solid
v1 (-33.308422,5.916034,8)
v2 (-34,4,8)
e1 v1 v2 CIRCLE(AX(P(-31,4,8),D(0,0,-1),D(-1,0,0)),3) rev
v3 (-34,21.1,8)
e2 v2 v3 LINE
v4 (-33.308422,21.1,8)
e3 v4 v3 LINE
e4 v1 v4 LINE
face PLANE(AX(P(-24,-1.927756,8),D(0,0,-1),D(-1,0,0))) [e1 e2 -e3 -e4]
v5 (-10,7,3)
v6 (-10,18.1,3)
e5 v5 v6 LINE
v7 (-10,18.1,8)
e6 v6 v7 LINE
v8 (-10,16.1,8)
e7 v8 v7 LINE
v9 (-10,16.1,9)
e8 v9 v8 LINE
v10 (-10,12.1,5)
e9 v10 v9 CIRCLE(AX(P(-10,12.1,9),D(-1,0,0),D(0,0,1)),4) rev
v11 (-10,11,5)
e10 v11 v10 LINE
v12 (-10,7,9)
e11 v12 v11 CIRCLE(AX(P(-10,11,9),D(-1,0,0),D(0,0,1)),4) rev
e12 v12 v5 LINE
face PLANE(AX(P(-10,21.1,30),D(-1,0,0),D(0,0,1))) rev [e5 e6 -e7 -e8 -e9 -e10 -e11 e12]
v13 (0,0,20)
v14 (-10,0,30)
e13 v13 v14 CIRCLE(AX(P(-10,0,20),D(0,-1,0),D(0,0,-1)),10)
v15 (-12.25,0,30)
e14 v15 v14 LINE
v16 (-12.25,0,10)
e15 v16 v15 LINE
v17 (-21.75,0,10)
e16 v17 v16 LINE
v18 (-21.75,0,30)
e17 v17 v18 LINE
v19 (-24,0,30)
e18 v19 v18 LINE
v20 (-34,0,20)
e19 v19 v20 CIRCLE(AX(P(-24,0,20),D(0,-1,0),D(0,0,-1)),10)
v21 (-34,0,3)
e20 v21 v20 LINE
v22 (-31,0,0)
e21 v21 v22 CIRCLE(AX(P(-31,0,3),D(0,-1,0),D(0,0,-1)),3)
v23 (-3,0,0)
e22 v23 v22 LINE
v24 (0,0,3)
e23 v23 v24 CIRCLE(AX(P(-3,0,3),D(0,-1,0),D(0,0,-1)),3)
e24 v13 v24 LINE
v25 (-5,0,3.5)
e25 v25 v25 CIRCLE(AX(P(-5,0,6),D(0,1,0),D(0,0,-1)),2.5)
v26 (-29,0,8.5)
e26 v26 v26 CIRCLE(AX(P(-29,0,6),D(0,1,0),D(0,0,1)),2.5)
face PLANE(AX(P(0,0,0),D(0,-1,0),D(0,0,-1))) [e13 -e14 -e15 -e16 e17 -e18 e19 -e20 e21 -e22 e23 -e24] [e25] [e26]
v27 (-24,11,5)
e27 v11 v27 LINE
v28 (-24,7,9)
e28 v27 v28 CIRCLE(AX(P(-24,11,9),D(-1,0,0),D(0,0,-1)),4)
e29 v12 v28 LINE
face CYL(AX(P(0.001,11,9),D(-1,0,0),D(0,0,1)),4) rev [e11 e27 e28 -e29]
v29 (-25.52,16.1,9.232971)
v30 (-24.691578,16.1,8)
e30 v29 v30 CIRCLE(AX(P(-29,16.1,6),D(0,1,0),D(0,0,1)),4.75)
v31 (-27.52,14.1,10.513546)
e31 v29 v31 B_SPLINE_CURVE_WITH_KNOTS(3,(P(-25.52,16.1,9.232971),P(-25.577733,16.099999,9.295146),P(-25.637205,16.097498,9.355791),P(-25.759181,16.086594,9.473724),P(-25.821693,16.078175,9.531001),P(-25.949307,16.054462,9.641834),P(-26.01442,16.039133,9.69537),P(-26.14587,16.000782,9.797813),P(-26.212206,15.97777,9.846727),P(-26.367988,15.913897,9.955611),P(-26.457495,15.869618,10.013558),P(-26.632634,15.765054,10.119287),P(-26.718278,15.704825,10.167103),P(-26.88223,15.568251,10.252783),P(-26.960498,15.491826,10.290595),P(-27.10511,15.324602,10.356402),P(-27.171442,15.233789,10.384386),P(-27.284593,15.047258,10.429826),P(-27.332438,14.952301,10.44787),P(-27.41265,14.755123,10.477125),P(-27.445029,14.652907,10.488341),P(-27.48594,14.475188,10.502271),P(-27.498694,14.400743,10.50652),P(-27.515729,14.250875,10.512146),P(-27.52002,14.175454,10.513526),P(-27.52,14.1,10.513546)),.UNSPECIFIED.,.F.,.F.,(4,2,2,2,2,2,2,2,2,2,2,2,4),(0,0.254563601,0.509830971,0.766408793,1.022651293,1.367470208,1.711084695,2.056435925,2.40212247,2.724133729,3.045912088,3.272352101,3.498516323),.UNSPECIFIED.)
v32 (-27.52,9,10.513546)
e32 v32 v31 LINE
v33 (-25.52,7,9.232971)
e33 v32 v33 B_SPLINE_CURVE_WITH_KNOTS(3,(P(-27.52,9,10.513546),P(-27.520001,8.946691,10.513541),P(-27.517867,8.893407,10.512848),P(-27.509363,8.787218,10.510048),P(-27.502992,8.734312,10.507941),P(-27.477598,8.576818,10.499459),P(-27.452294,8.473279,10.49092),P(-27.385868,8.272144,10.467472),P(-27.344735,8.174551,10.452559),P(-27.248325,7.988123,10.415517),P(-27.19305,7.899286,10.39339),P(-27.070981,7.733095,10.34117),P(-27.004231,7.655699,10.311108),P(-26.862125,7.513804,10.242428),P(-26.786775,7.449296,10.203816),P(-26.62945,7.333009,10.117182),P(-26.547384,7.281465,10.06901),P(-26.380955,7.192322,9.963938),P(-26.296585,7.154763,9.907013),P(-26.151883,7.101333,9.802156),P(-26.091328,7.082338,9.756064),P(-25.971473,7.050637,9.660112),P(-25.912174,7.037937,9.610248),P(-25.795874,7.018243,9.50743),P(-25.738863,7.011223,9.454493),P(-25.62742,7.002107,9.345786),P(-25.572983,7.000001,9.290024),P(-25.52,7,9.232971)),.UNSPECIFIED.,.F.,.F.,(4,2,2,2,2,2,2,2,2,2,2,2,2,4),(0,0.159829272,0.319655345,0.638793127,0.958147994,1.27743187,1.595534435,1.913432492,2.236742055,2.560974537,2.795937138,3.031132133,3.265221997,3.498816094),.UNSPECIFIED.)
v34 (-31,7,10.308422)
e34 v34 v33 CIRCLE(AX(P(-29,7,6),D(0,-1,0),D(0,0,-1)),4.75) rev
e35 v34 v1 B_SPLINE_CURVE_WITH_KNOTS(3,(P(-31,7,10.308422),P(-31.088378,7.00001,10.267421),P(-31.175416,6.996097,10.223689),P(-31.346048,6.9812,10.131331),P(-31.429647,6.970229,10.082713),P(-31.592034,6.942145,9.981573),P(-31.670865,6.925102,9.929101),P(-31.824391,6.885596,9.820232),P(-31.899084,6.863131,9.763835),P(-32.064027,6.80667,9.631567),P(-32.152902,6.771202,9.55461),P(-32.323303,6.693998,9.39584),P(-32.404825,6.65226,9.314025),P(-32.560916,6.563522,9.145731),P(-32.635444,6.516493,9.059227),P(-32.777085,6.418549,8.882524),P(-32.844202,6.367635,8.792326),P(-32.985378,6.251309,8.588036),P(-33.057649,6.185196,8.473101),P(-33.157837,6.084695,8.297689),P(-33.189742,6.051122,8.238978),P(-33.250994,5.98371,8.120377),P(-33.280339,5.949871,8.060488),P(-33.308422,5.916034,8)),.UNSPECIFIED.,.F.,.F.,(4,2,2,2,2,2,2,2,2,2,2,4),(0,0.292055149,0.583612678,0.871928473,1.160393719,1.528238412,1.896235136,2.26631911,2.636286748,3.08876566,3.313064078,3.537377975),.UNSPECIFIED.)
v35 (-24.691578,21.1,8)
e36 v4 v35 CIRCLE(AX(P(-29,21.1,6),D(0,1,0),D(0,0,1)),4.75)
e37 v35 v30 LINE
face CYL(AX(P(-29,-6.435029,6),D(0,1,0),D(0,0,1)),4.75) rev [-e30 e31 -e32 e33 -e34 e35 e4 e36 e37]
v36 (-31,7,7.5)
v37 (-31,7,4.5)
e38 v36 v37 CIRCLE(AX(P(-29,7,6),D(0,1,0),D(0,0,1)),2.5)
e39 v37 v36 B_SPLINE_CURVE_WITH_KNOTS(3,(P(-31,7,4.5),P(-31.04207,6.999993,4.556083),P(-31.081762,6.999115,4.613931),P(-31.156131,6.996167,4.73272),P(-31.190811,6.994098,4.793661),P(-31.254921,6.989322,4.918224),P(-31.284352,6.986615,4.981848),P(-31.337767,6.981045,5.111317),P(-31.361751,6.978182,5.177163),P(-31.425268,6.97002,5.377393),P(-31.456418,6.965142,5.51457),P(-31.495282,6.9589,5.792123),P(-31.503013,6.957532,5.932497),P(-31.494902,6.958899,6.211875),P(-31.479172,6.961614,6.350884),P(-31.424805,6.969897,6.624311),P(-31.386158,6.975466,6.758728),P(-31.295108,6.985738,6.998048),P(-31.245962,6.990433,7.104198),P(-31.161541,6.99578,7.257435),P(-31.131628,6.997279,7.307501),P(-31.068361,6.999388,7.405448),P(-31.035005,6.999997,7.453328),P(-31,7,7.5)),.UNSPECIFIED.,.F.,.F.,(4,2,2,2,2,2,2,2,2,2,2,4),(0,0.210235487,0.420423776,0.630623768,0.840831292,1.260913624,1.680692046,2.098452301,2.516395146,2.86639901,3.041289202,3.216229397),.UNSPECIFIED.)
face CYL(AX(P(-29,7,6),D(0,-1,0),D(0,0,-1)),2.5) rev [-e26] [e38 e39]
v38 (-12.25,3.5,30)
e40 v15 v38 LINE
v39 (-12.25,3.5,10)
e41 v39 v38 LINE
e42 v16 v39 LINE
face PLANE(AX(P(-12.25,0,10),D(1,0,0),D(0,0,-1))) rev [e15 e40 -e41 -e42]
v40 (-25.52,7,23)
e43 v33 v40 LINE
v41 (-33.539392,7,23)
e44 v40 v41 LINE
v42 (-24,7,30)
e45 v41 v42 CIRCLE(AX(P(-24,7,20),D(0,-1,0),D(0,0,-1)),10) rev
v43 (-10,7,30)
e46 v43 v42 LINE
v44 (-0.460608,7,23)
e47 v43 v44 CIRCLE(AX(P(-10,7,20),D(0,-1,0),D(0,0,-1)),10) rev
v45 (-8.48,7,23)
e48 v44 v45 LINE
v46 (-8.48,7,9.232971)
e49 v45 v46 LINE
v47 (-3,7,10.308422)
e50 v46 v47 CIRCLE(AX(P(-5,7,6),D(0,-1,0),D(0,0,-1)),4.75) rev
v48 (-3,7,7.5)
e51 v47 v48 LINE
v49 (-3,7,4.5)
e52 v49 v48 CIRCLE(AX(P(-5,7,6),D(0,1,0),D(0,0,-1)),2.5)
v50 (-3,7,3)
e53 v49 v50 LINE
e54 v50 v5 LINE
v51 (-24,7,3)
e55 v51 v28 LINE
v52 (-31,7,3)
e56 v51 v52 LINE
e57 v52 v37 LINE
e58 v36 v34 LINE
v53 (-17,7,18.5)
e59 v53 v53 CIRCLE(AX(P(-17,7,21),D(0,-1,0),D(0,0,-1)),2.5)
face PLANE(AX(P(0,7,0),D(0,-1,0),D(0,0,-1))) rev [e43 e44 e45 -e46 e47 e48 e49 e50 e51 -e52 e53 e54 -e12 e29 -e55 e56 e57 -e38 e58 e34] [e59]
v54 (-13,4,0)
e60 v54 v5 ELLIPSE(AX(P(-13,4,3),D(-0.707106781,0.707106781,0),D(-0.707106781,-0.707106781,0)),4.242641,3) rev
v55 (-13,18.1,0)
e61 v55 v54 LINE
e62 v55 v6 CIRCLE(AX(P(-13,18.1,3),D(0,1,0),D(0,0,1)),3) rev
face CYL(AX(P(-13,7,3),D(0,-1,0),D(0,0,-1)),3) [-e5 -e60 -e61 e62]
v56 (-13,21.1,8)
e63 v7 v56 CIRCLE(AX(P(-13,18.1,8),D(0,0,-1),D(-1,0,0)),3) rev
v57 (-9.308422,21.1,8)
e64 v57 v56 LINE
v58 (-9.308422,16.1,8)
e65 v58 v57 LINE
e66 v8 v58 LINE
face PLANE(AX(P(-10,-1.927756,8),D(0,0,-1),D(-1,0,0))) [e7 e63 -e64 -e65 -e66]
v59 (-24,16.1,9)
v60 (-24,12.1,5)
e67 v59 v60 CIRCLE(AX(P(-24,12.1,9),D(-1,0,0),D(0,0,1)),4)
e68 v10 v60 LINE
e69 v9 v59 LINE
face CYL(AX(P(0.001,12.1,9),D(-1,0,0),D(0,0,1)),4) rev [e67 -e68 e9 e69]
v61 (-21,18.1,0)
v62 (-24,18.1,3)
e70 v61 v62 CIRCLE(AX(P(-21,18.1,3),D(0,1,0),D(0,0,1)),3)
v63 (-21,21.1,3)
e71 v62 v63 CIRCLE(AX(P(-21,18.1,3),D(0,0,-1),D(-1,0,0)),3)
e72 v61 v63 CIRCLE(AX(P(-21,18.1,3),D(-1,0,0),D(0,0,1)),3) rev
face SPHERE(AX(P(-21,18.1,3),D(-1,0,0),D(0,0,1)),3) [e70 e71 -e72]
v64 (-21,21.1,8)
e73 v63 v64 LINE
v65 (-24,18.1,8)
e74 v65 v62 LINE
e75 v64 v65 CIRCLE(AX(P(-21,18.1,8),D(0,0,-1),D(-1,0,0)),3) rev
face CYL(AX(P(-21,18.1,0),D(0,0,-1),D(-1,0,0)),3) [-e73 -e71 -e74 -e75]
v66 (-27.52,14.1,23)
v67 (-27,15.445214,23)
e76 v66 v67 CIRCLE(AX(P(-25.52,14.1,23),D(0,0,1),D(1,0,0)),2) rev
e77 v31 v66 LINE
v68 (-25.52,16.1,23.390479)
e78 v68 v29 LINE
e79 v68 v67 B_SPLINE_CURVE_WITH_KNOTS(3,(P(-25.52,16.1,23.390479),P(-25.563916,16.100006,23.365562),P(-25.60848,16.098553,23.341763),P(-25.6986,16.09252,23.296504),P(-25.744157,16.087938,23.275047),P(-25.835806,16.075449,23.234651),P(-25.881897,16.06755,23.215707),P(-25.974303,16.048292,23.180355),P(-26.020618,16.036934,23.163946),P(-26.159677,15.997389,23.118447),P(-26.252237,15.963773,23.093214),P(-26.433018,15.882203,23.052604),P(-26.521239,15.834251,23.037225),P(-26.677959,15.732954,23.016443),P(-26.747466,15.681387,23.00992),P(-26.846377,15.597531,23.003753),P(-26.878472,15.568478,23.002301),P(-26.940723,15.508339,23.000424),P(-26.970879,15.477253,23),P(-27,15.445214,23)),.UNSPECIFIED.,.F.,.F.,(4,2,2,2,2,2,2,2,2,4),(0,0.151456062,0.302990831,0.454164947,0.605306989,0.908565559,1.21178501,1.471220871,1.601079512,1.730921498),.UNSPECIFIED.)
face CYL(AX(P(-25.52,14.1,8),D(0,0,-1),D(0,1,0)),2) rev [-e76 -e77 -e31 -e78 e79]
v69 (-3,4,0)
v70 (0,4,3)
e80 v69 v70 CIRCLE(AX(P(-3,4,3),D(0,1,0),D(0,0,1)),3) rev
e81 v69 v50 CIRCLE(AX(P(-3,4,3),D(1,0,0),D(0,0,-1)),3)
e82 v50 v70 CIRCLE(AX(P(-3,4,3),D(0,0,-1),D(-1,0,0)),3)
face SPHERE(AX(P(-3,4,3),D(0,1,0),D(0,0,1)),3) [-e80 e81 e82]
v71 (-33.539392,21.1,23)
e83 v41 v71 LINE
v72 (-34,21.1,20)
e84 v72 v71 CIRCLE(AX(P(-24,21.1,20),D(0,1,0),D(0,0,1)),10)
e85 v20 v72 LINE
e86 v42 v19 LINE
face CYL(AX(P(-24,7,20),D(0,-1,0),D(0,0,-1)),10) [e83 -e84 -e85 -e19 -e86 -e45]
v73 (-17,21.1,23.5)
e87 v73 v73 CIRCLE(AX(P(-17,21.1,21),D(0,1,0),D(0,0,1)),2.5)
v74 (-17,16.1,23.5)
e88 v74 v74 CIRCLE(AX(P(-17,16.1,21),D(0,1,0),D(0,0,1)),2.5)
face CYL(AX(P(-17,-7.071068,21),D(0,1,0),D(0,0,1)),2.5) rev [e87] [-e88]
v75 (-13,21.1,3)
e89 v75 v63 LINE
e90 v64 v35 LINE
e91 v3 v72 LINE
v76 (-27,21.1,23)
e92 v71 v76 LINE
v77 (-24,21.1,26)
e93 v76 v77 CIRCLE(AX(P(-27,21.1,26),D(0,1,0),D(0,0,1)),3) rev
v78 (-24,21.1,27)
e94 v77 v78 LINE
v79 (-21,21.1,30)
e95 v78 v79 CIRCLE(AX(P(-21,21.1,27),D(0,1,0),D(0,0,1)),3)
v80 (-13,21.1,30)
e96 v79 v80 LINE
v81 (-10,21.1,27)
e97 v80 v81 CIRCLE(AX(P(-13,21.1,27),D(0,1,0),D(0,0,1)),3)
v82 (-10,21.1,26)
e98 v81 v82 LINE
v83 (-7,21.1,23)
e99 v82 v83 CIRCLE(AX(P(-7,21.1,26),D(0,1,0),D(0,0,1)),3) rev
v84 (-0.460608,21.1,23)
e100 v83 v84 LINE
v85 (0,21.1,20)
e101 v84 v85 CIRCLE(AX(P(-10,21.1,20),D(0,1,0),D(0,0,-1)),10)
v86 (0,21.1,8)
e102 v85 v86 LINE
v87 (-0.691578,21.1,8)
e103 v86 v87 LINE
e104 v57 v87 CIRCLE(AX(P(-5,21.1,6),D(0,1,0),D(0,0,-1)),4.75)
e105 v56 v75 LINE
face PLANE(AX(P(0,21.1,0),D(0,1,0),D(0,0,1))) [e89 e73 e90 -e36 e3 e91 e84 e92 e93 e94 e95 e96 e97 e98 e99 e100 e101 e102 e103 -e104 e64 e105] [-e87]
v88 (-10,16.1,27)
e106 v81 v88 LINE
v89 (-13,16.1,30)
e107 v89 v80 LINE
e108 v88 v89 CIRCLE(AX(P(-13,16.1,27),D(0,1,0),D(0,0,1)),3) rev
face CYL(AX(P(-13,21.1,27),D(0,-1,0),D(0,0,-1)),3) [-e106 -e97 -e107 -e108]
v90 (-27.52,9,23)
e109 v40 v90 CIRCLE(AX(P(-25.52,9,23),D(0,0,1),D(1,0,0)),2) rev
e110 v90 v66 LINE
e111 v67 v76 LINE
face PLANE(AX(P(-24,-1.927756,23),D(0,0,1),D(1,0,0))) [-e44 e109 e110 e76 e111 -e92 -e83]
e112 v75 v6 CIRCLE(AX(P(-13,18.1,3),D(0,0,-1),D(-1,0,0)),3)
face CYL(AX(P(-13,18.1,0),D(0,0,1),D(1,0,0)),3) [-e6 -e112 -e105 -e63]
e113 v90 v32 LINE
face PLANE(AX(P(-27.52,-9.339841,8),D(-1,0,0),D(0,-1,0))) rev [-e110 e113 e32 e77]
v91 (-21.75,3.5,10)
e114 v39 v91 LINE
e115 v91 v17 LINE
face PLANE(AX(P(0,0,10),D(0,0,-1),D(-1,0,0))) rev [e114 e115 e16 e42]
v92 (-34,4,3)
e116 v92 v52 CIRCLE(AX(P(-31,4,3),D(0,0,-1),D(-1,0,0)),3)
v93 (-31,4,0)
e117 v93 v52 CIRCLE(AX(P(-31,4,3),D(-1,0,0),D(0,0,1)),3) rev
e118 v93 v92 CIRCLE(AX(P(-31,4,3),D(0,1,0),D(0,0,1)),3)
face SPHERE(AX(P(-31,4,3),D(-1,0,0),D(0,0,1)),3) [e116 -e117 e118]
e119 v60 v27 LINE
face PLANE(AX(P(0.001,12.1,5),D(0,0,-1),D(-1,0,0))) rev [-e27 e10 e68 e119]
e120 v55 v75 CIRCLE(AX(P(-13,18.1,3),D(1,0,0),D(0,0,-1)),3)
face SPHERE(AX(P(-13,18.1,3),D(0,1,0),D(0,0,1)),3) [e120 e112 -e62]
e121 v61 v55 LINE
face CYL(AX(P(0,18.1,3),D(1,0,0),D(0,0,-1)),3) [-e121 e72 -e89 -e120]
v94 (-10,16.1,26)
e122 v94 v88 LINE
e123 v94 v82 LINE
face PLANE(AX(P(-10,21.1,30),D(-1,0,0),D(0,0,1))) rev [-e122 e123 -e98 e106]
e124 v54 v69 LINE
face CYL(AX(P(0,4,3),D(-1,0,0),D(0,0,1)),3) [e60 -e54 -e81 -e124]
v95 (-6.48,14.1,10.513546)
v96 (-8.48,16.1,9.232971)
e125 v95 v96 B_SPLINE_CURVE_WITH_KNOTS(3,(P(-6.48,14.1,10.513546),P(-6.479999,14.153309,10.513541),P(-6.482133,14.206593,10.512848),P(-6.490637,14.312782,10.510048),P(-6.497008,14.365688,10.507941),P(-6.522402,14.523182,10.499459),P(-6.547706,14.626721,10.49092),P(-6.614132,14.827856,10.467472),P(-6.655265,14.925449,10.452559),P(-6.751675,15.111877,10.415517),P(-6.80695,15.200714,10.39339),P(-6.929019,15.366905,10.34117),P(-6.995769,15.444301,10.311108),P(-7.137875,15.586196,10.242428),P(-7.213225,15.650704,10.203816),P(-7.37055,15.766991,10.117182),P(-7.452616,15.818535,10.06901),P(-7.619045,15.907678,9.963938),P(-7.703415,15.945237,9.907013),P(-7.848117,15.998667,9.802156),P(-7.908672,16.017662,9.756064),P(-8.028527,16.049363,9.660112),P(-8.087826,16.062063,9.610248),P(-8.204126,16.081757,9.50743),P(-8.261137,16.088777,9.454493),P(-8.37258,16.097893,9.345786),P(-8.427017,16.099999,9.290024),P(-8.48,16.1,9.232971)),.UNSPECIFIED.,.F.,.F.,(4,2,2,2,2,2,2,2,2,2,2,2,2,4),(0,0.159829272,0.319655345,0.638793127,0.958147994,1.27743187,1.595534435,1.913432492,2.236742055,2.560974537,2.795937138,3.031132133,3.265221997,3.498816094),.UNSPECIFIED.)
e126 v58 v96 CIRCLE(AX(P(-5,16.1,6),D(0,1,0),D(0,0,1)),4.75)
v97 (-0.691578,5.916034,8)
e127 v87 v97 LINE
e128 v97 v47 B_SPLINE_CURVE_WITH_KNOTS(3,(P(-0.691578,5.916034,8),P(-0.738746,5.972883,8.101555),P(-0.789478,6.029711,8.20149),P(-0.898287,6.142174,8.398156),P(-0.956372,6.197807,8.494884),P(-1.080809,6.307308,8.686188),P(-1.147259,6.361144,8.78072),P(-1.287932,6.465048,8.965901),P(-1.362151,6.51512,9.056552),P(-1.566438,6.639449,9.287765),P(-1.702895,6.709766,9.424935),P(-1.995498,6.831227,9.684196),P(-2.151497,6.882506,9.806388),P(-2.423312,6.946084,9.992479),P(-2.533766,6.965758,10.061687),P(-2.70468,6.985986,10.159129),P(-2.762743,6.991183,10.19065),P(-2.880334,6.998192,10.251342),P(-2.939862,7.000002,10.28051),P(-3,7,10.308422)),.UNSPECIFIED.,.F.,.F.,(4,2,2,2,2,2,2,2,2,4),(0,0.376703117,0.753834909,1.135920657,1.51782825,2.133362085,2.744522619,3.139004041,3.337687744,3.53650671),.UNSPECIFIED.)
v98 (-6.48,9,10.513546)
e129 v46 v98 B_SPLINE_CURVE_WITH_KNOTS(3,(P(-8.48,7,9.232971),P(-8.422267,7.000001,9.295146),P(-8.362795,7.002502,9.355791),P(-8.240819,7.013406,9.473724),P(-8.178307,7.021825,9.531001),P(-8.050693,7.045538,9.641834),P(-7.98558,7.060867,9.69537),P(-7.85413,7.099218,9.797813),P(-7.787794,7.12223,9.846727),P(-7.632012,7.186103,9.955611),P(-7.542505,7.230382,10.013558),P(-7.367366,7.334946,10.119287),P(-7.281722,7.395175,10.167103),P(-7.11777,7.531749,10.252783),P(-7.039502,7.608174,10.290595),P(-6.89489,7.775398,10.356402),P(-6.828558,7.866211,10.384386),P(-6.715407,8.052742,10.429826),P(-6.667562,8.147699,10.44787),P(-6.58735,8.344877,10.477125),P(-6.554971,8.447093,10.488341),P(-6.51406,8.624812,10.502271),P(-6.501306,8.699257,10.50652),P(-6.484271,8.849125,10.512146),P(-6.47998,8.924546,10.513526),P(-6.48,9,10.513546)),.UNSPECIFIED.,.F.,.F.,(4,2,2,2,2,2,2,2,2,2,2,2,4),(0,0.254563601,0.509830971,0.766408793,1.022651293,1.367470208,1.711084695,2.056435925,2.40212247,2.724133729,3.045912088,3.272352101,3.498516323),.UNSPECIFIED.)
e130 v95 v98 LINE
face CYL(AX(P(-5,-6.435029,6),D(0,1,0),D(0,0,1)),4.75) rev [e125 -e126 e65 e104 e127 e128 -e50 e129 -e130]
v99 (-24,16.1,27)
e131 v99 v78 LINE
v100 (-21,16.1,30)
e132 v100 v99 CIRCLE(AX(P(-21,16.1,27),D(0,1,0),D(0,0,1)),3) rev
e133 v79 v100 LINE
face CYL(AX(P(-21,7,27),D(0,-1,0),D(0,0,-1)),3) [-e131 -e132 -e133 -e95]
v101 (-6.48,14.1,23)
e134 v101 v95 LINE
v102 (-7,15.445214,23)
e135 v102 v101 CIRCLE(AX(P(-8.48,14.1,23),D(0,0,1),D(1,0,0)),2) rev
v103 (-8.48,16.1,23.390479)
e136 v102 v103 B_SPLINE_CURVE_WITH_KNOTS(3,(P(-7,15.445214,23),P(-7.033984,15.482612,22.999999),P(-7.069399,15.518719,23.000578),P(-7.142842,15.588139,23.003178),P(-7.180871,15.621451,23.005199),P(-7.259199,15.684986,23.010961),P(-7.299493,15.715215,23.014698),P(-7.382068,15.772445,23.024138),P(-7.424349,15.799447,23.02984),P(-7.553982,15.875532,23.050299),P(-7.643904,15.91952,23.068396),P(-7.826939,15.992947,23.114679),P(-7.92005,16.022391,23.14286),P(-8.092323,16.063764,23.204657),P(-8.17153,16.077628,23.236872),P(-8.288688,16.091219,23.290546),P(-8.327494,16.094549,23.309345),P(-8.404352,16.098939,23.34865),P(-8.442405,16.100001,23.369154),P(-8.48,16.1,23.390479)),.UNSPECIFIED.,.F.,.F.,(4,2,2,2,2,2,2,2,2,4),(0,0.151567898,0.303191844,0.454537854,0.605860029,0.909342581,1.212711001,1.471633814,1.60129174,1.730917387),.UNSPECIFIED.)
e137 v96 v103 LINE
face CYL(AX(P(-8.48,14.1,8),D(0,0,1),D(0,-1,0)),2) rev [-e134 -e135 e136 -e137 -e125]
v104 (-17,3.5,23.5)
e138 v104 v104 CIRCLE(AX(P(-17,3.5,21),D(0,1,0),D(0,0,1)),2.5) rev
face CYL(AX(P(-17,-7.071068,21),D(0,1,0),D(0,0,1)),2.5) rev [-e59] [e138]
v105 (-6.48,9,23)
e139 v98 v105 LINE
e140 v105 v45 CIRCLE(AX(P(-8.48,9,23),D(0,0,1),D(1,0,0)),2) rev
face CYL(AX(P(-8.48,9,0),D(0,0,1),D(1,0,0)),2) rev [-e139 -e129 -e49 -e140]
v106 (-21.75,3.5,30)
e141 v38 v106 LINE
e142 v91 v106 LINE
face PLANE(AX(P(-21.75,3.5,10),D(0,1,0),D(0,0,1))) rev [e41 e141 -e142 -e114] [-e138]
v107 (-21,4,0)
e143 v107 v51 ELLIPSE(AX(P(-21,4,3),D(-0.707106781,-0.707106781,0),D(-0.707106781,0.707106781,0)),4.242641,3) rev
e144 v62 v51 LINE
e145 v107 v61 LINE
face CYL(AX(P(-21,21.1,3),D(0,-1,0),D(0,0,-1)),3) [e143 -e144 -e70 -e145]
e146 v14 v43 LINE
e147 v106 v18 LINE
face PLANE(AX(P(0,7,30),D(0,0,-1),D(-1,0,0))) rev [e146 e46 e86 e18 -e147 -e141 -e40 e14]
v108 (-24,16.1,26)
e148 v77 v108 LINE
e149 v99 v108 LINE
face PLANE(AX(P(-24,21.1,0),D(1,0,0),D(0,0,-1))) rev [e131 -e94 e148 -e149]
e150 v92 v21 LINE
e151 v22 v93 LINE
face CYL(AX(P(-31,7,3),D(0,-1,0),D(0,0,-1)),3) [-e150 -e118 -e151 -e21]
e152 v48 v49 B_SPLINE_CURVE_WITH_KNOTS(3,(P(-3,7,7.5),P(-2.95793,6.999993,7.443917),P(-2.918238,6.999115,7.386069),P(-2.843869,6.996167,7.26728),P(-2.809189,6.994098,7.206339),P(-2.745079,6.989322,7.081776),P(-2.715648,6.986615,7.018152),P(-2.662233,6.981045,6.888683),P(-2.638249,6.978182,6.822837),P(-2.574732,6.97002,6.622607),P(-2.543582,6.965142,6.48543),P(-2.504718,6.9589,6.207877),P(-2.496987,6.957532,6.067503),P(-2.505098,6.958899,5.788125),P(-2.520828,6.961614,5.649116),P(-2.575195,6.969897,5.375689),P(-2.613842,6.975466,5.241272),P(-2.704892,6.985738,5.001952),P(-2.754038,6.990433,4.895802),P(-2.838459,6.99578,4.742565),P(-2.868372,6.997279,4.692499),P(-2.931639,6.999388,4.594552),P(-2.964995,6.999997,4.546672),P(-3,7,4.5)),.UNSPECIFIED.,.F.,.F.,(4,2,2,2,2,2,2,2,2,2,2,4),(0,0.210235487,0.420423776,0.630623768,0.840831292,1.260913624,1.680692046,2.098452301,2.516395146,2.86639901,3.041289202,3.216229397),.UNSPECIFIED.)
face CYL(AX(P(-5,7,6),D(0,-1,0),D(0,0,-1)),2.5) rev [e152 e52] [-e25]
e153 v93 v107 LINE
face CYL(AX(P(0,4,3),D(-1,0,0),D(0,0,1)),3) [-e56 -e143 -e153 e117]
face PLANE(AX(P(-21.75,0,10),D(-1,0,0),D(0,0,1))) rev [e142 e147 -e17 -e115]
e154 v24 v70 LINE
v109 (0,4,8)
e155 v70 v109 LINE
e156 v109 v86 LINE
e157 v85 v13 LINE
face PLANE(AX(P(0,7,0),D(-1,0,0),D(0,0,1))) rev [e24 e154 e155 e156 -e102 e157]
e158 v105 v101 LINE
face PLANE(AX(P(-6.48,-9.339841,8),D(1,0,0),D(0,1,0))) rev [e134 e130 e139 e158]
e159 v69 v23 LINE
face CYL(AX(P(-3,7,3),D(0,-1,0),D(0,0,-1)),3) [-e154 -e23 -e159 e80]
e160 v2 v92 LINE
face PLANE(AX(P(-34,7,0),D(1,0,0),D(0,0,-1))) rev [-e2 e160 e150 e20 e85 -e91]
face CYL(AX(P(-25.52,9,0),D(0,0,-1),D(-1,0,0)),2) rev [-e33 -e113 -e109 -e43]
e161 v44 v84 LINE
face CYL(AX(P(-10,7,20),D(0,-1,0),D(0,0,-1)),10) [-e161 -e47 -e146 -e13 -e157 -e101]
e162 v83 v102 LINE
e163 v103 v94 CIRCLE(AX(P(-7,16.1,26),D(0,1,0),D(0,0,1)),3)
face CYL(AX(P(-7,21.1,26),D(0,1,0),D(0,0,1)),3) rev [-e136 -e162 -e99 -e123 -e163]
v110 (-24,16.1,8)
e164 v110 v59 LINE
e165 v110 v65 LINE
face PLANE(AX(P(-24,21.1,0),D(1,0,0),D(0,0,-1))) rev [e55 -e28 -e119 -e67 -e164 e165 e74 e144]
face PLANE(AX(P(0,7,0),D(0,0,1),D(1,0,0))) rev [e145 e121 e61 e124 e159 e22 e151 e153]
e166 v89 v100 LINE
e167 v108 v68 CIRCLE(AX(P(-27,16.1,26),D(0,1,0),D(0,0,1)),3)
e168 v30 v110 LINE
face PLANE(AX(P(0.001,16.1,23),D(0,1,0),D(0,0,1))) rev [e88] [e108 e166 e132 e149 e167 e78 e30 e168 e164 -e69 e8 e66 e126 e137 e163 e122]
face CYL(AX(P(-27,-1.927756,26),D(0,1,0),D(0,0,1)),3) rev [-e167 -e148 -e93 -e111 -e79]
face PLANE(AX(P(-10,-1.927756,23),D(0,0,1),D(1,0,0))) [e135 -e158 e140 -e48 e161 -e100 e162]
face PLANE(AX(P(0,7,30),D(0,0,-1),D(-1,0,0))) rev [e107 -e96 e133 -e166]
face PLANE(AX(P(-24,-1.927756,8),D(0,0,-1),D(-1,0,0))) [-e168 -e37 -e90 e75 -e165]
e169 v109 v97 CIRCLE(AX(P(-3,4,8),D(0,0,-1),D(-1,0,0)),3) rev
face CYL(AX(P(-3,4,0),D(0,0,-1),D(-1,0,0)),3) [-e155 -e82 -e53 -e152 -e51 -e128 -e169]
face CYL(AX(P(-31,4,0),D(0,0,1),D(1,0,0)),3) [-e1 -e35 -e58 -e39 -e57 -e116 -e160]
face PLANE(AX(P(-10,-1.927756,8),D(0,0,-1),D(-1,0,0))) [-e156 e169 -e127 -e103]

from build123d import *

# Parameters (mm, degrees)
CROQUIS1_W              = 34
CROQUIS1_H              = 30
CROQUIS1_R              = 2.5
SALIENTE_EXTRUIR1_DEPTH = 7
REDONDEO1_R             = 10
CROQUIS2_W              = 14
CROQUIS2_H              = 30
SALIENTE_EXTRUIR2_DEPTH = 14.1
CORTAR_EXTRUIR1_REACH   = 45.832
CORTAR_EXTRUIR2_REACH   = 52.012
CROQUIS4_R              = 2.5
CROQUIS5_W              = 9.5
CROQUIS5_H              = 3.5
CORTAR_EXTRUIR3_DEPTH   = 20
SALIENTE_EXTRUIR3_DEPTH = 5
SALIENTE_EXTRUIR4_DEPTH = 9.1
CORTAR_EXTRUIR4_REACH   = 52.012
CROQUIS8_R              = 4.75
REDONDEO5_R             = 2
REDONDEO6_R             = 3
REDONDEO7_R             = 3


with BuildPart() as part:
    # Croquis1 → Saliente-Extruir1 (new body)
    with BuildSketch(Plane(origin=(0, 0, 0), x_dir=(1, 0, 0), z_dir=(0, 1, 0))):
        with Locations((-17, -15)):
            Rectangle(CROQUIS1_W, CROQUIS1_H)
        with Locations(Location((-29, -6, 0), (0, 0, 90))):
            Circle(CROQUIS1_R, mode=Mode.SUBTRACT)
        with Locations(Location((-5, -6, 0), (0, 0, 90))):
            Circle(CROQUIS1_R, mode=Mode.SUBTRACT)
    extrude(amount=SALIENTE_EXTRUIR1_DEPTH)

    # Redondeo1
    redondeo1_edges = [part.edges().sort_by_distance(p)[0] for p in [
        (0, 3.5, 30),
        (-34, 3.5, 30),
    ]]
    fillet(redondeo1_edges, radius=REDONDEO1_R)

    # Croquis2 → Saliente-Extruir2 (add)
    with BuildSketch(Plane(origin=(0, 7, 0), x_dir=(1, 0, 0), z_dir=(0, 1, 0))):
        with Locations((-17, -15)):
            Rectangle(CROQUIS2_W, CROQUIS2_H)
    extrude(amount=SALIENTE_EXTRUIR2_DEPTH)

    # Croquis3 → Cortar-Extruir1 (cut, up to next)
    with BuildSketch(Plane.ZY.offset(24), mode=Mode.PRIVATE) as cortar_extruir1_sk1:
        with BuildLine():
            Line((9, 7), (30, 7))
            Line((30, 7), (30, 16.1))
            Line((30, 16.1), (23, 16.1))
            Line((23, 16.1), (9, 16.1))
            ThreePointArc((9, 16.1), (6.171572875, 14.928427125), (5, 12.1))
            Line((5, 12.1), (5, 11))
            ThreePointArc((5, 11), (6.171572875, 8.171572875), (9, 7))
        make_face()
    cortar_extruir1_tool1 = extrude(cortar_extruir1_sk1.sketch, amount=-CORTAR_EXTRUIR1_REACH, mode=Mode.PRIVATE) & part.part
    add(cortar_extruir1_tool1.solids().sort_by_distance((-24, 11.55, 17.861257))[0], mode=Mode.SUBTRACT)

    # Cortar-Extruir2: up to this face of the body (flat: up to its plane)
    cortar_extruir2_end = Plane(part.part.faces().sort_by_distance((-17, 0, 14.792595458))[0])
    # Croquis4 → Cortar-Extruir2 (cut, up to the picked face)
    with BuildSketch(Plane(origin=(0, 21.1, 0), x_dir=(1, 0, 0), z_dir=(0, 1, 0)), mode=Mode.PRIVATE) as cortar_extruir2_sk1:
        with Locations(Location((-17, -21, 0), (0, 0, 270))):
            Circle(CROQUIS4_R)
    cortar_extruir2_tool1 = split(extrude(cortar_extruir2_sk1.sketch, amount=-CORTAR_EXTRUIR2_REACH, mode=Mode.PRIVATE), bisect_by=cortar_extruir2_end, keep=Keep.BOTH, mode=Mode.PRIVATE)
    add(cortar_extruir2_tool1.solids().sort_by(Axis((-17, 21.1, 21), (0, -1, 0)))[0], mode=Mode.SUBTRACT)

    # Croquis5 → Cortar-Extruir3 (cut)
    with BuildSketch(Plane.XY.offset(30)):
        with Locations((-17, 1.75)):
            Rectangle(CROQUIS5_W, CROQUIS5_H)
    extrude(amount=-CORTAR_EXTRUIR3_DEPTH, mode=Mode.SUBTRACT)

    # Croquis6 → Saliente-Extruir3 (add)
    with BuildSketch(Plane(origin=(0, 21.1, 0), x_dir=(1, 0, 0), z_dir=(0, 1, 0))):
        with BuildLine():
            Line((-24, -23), (-33.539392014, -23))
            ThreePointArc((-33.539392014, -23), (-33.884177258, -21.517576993), (-34, -20))
            Line((-34, -20), (-34, -8))
            Line((-34, -8), (-24, -8))
            Line((-24, -8), (-24, -23))
        make_face()
        with BuildLine():
            Line((-10, -23), (-0.460607986, -23))
            ThreePointArc((-0.460607986, -23), (-0.115822742, -21.517576993), (0, -20))
            Line((0, -20), (0, -8))
            Line((0, -8), (-10, -8))
            Line((-10, -8), (-10, -23))
        make_face()
    extrude(amount=-SALIENTE_EXTRUIR3_DEPTH)

    # Croquis7 → Saliente-Extruir4 (add)
    with BuildSketch(Plane.XZ.offset(-16.1)):
        with BuildLine():
            Line((-27.52, 8), (-34, 8))
            Line((-34, 8), (-34, 20))
            ThreePointArc((-34, 20), (-33.884177258, 21.517576993), (-33.539392014, 23))
            Line((-33.539392014, 23), (-27.52, 23))
            Line((-27.52, 23), (-27.52, 8))
        make_face()
        with BuildLine():
            Line((0, 8), (0, 20))
            ThreePointArc((0, 20), (-0.115822742, 21.517576993), (-0.460607986, 23))
            Line((-0.460607986, 23), (-6.48, 23))
            Line((-6.48, 23), (-6.48, 8))
            Line((-6.48, 8), (0, 8))
        make_face()
    extrude(amount=SALIENTE_EXTRUIR4_DEPTH)

    # Cortar-Extruir4: up to this face of the body (flat: up to its plane)
    cortar_extruir4_end = Plane(part.part.faces().sort_by_distance((-17, 7, 16.508515524))[0])
    # Croquis8 → Cortar-Extruir4 (cut, up to the picked face)
    with BuildSketch(Plane(origin=(0, 21.1, 0), x_dir=(1, 0, 0), z_dir=(0, 1, 0)), mode=Mode.PRIVATE) as cortar_extruir4_sk1:
        with Locations((-29, -6)):
            Circle(CROQUIS8_R)
    cortar_extruir4_tool1 = split(extrude(cortar_extruir4_sk1.sketch, amount=-CORTAR_EXTRUIR4_REACH, mode=Mode.PRIVATE), bisect_by=cortar_extruir4_end, keep=Keep.BOTH, mode=Mode.PRIVATE)
    # Croquis8 → Cortar-Extruir4 (cut, up to the picked face)
    with BuildSketch(Plane(origin=(0, 21.1, 0), x_dir=(1, 0, 0), z_dir=(0, 1, 0)), mode=Mode.PRIVATE) as cortar_extruir4_sk2:
        with Locations((-5, -6)):
            Circle(CROQUIS8_R)
    cortar_extruir4_tool2 = split(extrude(cortar_extruir4_sk2.sketch, amount=-CORTAR_EXTRUIR4_REACH, mode=Mode.PRIVATE), bisect_by=cortar_extruir4_end, keep=Keep.BOTH, mode=Mode.PRIVATE)
    add(cortar_extruir4_tool1.solids().sort_by(Axis((-29, 21.1, 6), (0, -1, 0)))[0], mode=Mode.SUBTRACT)
    add(cortar_extruir4_tool2.solids().sort_by(Axis((-5, 21.1, 6), (0, -1, 0)))[0], mode=Mode.SUBTRACT)

    # Redondeo5
    redondeo5_edges = [part.edges().sort_by_distance(p)[0] for p in [
        (-6.48, 7, 16.756773139),
        (-6.48, 16.1, 16.756773139),
        (-27.52, 16.1, 16.756773139),
        (-27.52, 7, 16.756773139),
    ]]
    fillet(redondeo5_edges, radius=REDONDEO5_R)

    # Redondeo6
    redondeo6_edges = [part.edges().sort_by_distance(p)[0] for p in [
        (-24, 18.6, 23),
        (-10, 18.6, 23),
        (-10, 18.6, 30),
        (-24, 18.6, 30),
    ]]
    fillet(redondeo6_edges, radius=REDONDEO6_R)

    # Redondeo7
    # the kernel refuses this fillet: 3 mm, written as the material it takes off along each edge
    with BuildSketch(Plane(origin=(-3, 4, 3), x_dir=(0, 1, 0), z_dir=(0, 0, -1))) as redondeo7_piece_1_section:
        Polygon((0, 0), (REDONDEO7_R, 0), (REDONDEO7_R, REDONDEO7_R), (0, REDONDEO7_R), align=None)
    redondeo7_piece_1 = extrude(amount=REDONDEO7_R, mode=Mode.PRIVATE)
    redondeo7_piece_1 = redondeo7_piece_1 - Plane(origin=(-3, 4, 3), x_dir=(-0.7071067811865475, -0.7071067811865475, 0), z_dir=(0, 0, -1)) * Sphere(REDONDEO7_R, mode=Mode.PRIVATE)
    add(redondeo7_piece_1, mode=Mode.SUBTRACT)
    with BuildSketch(Plane(origin=(-31, 4, 3), x_dir=(0, 1, 0), z_dir=(-1, 0, 0))) as redondeo7_piece_2_section:
        Polygon((0, 0), (REDONDEO7_R, 0), (REDONDEO7_R, REDONDEO7_R), (0, REDONDEO7_R), align=None)
    redondeo7_piece_2 = extrude(amount=REDONDEO7_R, mode=Mode.PRIVATE)
    redondeo7_piece_2 = redondeo7_piece_2 - Plane(origin=(-31, 4, 3), x_dir=(0, -0.7071067811865475, 0.7071067811865475), z_dir=(-1, 0, 0)) * Sphere(REDONDEO7_R, mode=Mode.PRIVATE)
    add(redondeo7_piece_2, mode=Mode.SUBTRACT)
    with BuildSketch(Plane(origin=(-21, 18.1, 3), x_dir=(0, 1, 0), z_dir=(-1, 0, 0))) as redondeo7_piece_3_section:
        Polygon((0, 0), (REDONDEO7_R, 0), (REDONDEO7_R, REDONDEO7_R), (0, REDONDEO7_R), align=None)
    redondeo7_piece_3 = extrude(amount=REDONDEO7_R, mode=Mode.PRIVATE)
    redondeo7_piece_3 = redondeo7_piece_3 - Plane(origin=(-21, 18.1, 3), x_dir=(0, -0.7071067811865475, 0.7071067811865475), z_dir=(-1, 0, 0)) * Sphere(REDONDEO7_R, mode=Mode.PRIVATE)
    add(redondeo7_piece_3, mode=Mode.SUBTRACT)
    with BuildSketch(Plane(origin=(-13, 18.1, 3), x_dir=(1, 0, 0), z_dir=(0, 1, 0))) as redondeo7_piece_4_section:
        Polygon((0, 0), (REDONDEO7_R, 0), (REDONDEO7_R, REDONDEO7_R), (0, REDONDEO7_R), align=None)
    redondeo7_piece_4 = extrude(amount=REDONDEO7_R, mode=Mode.PRIVATE)
    redondeo7_piece_4 = redondeo7_piece_4 - Plane(origin=(-13, 18.1, 3), x_dir=(-0.7071067811865468, 0, 0.707106781186548), z_dir=(0, 1, 0)) * Sphere(REDONDEO7_R, mode=Mode.PRIVATE)
    add(redondeo7_piece_4, mode=Mode.SUBTRACT)
    with BuildSketch(Plane(origin=(0, -7.5, 0), x_dir=(0, 0, 1), z_dir=(0, 1, 0)), Plane(origin=(-34, -7.5, 0), x_dir=(1, 0, 0), z_dir=(0, 1, 0))) as redondeo7_piece_5:
        with BuildLine():
            CenterArc((REDONDEO7_R, -REDONDEO7_R), REDONDEO7_R, 90, 90)
            Line((0, -REDONDEO7_R), (0, 0))
            Line((0, 0), (REDONDEO7_R, 0))
        make_face()
    extrude(amount=11.5, mode=Mode.SUBTRACT)
    with BuildSketch(Plane(origin=(-34, 7, 3), x_dir=(1, 0, 0), z_dir=(0, 0, 1))) as redondeo7_piece_6_section:
        with BuildLine():
            CenterArc((REDONDEO7_R, -REDONDEO7_R), REDONDEO7_R, 90, 90)
            Line((0, -REDONDEO7_R), (0, 0))
            Line((0, 0), (REDONDEO7_R, 0))
        make_face()
    redondeo7_piece_6 = extrude(amount=5, mode=Mode.PRIVATE)
    redondeo7_piece_6 = redondeo7_piece_6 & Plane(origin=(-29, 6.638457851, 6), x_dir=(1, 0, 0), z_dir=(0, 1, 0)) * Cylinder(4.75, 23, mode=Mode.PRIVATE)
    add(redondeo7_piece_6, mode=Mode.SUBTRACT)
    with BuildSketch(Plane(origin=(-34, 7, 3), x_dir=(1, 0, 0), z_dir=(0, 0, 1))) as redondeo7_piece_7_section:
        with BuildLine():
            CenterArc((REDONDEO7_R, -REDONDEO7_R), REDONDEO7_R, 90, 90)
            Line((0, -REDONDEO7_R), (0, 0))
            Line((0, 0), (REDONDEO7_R, 0))
        make_face()
    redondeo7_piece_7 = extrude(amount=5, mode=Mode.PRIVATE)
    redondeo7_piece_7 = redondeo7_piece_7 - Plane(origin=(-29, 5.984939517, 6), x_dir=(1, 0, 0), z_dir=(0, 1, 0)) * Cylinder(4.75, 23, mode=Mode.PRIVATE)
    add(redondeo7_piece_7, mode=Mode.SUBTRACT)
    with BuildSketch(Plane(origin=(-34, 7, 3), x_dir=(1, 0, 0), z_dir=(0, 0, 1))) as redondeo7_piece_8_section:
        with BuildLine():
            CenterArc((REDONDEO7_R, -REDONDEO7_R), REDONDEO7_R, 90, 90)
            Line((0, -REDONDEO7_R), (0, 0))
            Line((0, 0), (REDONDEO7_R, 0))
        make_face()
    redondeo7_piece_8 = extrude(amount=12.5, mode=Mode.PRIVATE)
    redondeo7_piece_8 = split(redondeo7_piece_8, bisect_by=Plane(origin=(-32.327413767, 6.840048654, 8), z_dir=(0, 0, 1)), keep=Keep.TOP, mode=Mode.PRIVATE)
    redondeo7_piece_8 = redondeo7_piece_8 & Plane(origin=(-29, 6.840048654, 6), x_dir=(1, 0, 0), z_dir=(0, 1, 0)) * Cylinder(4.75, 38, mode=Mode.PRIVATE)
    add(redondeo7_piece_8, mode=Mode.SUBTRACT)
    with BuildSketch(Plane(origin=(0, 7, 8), x_dir=(-1, 0, 0), z_dir=(0, 0, -1))) as redondeo7_piece_9_section:
        with BuildLine():
            CenterArc((REDONDEO7_R, -REDONDEO7_R), REDONDEO7_R, 90, 90)
            Line((0, -REDONDEO7_R), (0, 0))
            Line((0, 0), (REDONDEO7_R, 0))
        make_face()
    redondeo7_piece_9 = extrude(amount=5, mode=Mode.PRIVATE)
    redondeo7_piece_9 = redondeo7_piece_9 - Plane(origin=(-5, 5.984939497, 6), x_dir=(1, 0, 0), z_dir=(0, 1, 0)) * Cylinder(4.75, 23, mode=Mode.PRIVATE)
    add(redondeo7_piece_9, mode=Mode.SUBTRACT)
    with BuildSketch(Plane(origin=(0, 7, 15.5), x_dir=(-1, 0, 0), z_dir=(0, 0, -1))) as redondeo7_piece_10_section:
        with BuildLine():
            CenterArc((REDONDEO7_R, -REDONDEO7_R), REDONDEO7_R, 90, 90)
            Line((0, -REDONDEO7_R), (0, 0))
            Line((0, 0), (REDONDEO7_R, 0))
        make_face()
    redondeo7_piece_10 = extrude(amount=12.5, mode=Mode.PRIVATE)
    redondeo7_piece_10 = redondeo7_piece_10 & Plane(origin=(-5, 6.840048634, 6), x_dir=(1, 0, 0), z_dir=(0, 1, 0)) * Cylinder(4.75, 38, mode=Mode.PRIVATE)
    redondeo7_piece_10 = split(redondeo7_piece_10, bisect_by=Plane(origin=(-1.672586324, 6.840048634, 8), z_dir=(0, 0, 1)), keep=Keep.TOP, mode=Mode.PRIVATE)
    add(redondeo7_piece_10, mode=Mode.SUBTRACT)
    with BuildSketch(Plane(origin=(0, 7, 8), x_dir=(-1, 0, 0), z_dir=(0, 0, -1))) as redondeo7_piece_11_section:
        with BuildLine():
            CenterArc((REDONDEO7_R, -REDONDEO7_R), REDONDEO7_R, 90, 90)
            Line((0, -REDONDEO7_R), (0, 0))
            Line((0, 0), (REDONDEO7_R, 0))
        make_face()
    redondeo7_piece_11 = extrude(amount=5, mode=Mode.PRIVATE)
    redondeo7_piece_11 = redondeo7_piece_11 & Plane(origin=(-5, 6.638457797, 6), x_dir=(1, 0, 0), z_dir=(0, 1, 0)) * Cylinder(4.75, 23, mode=Mode.PRIVATE)
    add(redondeo7_piece_11, mode=Mode.SUBTRACT)
    with BuildSketch(Plane(origin=(-3, 7, 0), x_dir=(0, 0, 1), z_dir=(-1, 0, 0)), Plane(origin=(-24, 7, 0), x_dir=(0, 0, 1), z_dir=(-1, 0, 0))) as redondeo7_piece_12:
        with BuildLine():
            CenterArc((REDONDEO7_R, -REDONDEO7_R), REDONDEO7_R, 90, 90)
            Line((0, -REDONDEO7_R), (0, 0))
            Line((0, 0), (REDONDEO7_R, 0))
        make_face()
    extrude(amount=7, mode=Mode.SUBTRACT)
    with BuildSketch(Plane(origin=(-24, 21.1, 3), x_dir=(1, 0, 0), z_dir=(0, 0, 1)), Plane(origin=(-10, 21.1, 8), x_dir=(-1, 0, 0), z_dir=(0, 0, -1))) as redondeo7_piece_13:
        with BuildLine():
            CenterArc((REDONDEO7_R, -REDONDEO7_R), REDONDEO7_R, 90, 90)
            Line((0, -REDONDEO7_R), (0, 0))
            Line((0, 0), (REDONDEO7_R, 0))
        make_face()
    extrude(amount=5, mode=Mode.SUBTRACT)
    with BuildSketch(Plane(origin=(-10, 7, 0), x_dir=(0, 0, 1), z_dir=(0, 1, 0)), Plane(origin=(-24, 7, 0), x_dir=(1, 0, 0), z_dir=(0, 1, 0))) as redondeo7_piece_14:
        with BuildLine():
            CenterArc((REDONDEO7_R, -REDONDEO7_R), REDONDEO7_R, 90, 90)
            Line((0, -REDONDEO7_R), (0, 0))
            Line((0, 0), (REDONDEO7_R, 0))
        make_face()
    extrude(amount=11.1, mode=Mode.SUBTRACT)
    with BuildSketch(Plane(origin=(-13, 21.1, 0), x_dir=(0, 0, 1), z_dir=(-1, 0, 0))) as redondeo7_piece_15:
        with BuildLine():
            CenterArc((REDONDEO7_R, -REDONDEO7_R), REDONDEO7_R, 90, 90)
            Line((0, -REDONDEO7_R), (0, 0))
            Line((0, 0), (REDONDEO7_R, 0))
        make_face()
    extrude(amount=8, mode=Mode.SUBTRACT)
    with BuildSketch(Plane(origin=(-3, 7, 0), x_dir=(0, 0, 1), z_dir=(-1, 0, 0))) as redondeo7_piece_16a_section:
        with BuildLine():
            CenterArc((REDONDEO7_R, -REDONDEO7_R), REDONDEO7_R, 90, 90)
            Line((0, -REDONDEO7_R), (0, 0))
            Line((0, 0), (REDONDEO7_R, 0))
        make_face()
    redondeo7_piece_16a = extrude(amount=14.5, mode=Mode.PRIVATE)
    redondeo7_piece_16a = split(redondeo7_piece_16a, bisect_by=Plane(origin=(-10, 6.320814657, 0.679185343), z_dir=(-1, 0, 0)), keep=Keep.TOP, mode=Mode.PRIVATE)
    with BuildSketch(Plane(origin=(-10, -0.5, 0), x_dir=(0, 0, 1), z_dir=(0, 1, 0))) as redondeo7_piece_16b_section:
        with BuildLine():
            CenterArc((REDONDEO7_R, -REDONDEO7_R), REDONDEO7_R, 90, 90)
            Line((0, -REDONDEO7_R), (0, 0))
            Line((0, 0), (REDONDEO7_R, 0))
        make_face()
    redondeo7_piece_16b = extrude(amount=18.6, mode=Mode.PRIVATE)
    redondeo7_piece_16b = split(redondeo7_piece_16b, bisect_by=Plane(origin=(-10.679185343, 7, 0.679185343), z_dir=(0, -1, 0)), keep=Keep.TOP, mode=Mode.PRIVATE)
    redondeo7_piece_16 = redondeo7_piece_16a & redondeo7_piece_16b
    add(redondeo7_piece_16, mode=Mode.SUBTRACT)
    with BuildSketch(Plane(origin=(-16.5, 7, 0), x_dir=(0, 0, 1), z_dir=(-1, 0, 0))) as redondeo7_piece_17a_section:
        with BuildLine():
            CenterArc((REDONDEO7_R, -REDONDEO7_R), REDONDEO7_R, 90, 90)
            Line((0, -REDONDEO7_R), (0, 0))
            Line((0, 0), (REDONDEO7_R, 0))
        make_face()
    redondeo7_piece_17a = extrude(amount=14.5, mode=Mode.PRIVATE)
    redondeo7_piece_17a = split(redondeo7_piece_17a, bisect_by=Plane(origin=(-24, 6.320814657, 0.679185343), z_dir=(1, 0, 0)), keep=Keep.TOP, mode=Mode.PRIVATE)
    with BuildSketch(Plane(origin=(-24, -0.5, 0), x_dir=(1, 0, 0), z_dir=(0, 1, 0))) as redondeo7_piece_17b_section:
        with BuildLine():
            CenterArc((REDONDEO7_R, -REDONDEO7_R), REDONDEO7_R, 90, 90)
            Line((0, -REDONDEO7_R), (0, 0))
            Line((0, 0), (REDONDEO7_R, 0))
        make_face()
    redondeo7_piece_17b = extrude(amount=18.6, mode=Mode.PRIVATE)
    redondeo7_piece_17b = split(redondeo7_piece_17b, bisect_by=Plane(origin=(-23.320814657, 7, 0.679185343), z_dir=(0, -1, 0)), keep=Keep.TOP, mode=Mode.PRIVATE)
    redondeo7_piece_17 = redondeo7_piece_17a & redondeo7_piece_17b
    add(redondeo7_piece_17, mode=Mode.SUBTRACT)


solid = part.part
